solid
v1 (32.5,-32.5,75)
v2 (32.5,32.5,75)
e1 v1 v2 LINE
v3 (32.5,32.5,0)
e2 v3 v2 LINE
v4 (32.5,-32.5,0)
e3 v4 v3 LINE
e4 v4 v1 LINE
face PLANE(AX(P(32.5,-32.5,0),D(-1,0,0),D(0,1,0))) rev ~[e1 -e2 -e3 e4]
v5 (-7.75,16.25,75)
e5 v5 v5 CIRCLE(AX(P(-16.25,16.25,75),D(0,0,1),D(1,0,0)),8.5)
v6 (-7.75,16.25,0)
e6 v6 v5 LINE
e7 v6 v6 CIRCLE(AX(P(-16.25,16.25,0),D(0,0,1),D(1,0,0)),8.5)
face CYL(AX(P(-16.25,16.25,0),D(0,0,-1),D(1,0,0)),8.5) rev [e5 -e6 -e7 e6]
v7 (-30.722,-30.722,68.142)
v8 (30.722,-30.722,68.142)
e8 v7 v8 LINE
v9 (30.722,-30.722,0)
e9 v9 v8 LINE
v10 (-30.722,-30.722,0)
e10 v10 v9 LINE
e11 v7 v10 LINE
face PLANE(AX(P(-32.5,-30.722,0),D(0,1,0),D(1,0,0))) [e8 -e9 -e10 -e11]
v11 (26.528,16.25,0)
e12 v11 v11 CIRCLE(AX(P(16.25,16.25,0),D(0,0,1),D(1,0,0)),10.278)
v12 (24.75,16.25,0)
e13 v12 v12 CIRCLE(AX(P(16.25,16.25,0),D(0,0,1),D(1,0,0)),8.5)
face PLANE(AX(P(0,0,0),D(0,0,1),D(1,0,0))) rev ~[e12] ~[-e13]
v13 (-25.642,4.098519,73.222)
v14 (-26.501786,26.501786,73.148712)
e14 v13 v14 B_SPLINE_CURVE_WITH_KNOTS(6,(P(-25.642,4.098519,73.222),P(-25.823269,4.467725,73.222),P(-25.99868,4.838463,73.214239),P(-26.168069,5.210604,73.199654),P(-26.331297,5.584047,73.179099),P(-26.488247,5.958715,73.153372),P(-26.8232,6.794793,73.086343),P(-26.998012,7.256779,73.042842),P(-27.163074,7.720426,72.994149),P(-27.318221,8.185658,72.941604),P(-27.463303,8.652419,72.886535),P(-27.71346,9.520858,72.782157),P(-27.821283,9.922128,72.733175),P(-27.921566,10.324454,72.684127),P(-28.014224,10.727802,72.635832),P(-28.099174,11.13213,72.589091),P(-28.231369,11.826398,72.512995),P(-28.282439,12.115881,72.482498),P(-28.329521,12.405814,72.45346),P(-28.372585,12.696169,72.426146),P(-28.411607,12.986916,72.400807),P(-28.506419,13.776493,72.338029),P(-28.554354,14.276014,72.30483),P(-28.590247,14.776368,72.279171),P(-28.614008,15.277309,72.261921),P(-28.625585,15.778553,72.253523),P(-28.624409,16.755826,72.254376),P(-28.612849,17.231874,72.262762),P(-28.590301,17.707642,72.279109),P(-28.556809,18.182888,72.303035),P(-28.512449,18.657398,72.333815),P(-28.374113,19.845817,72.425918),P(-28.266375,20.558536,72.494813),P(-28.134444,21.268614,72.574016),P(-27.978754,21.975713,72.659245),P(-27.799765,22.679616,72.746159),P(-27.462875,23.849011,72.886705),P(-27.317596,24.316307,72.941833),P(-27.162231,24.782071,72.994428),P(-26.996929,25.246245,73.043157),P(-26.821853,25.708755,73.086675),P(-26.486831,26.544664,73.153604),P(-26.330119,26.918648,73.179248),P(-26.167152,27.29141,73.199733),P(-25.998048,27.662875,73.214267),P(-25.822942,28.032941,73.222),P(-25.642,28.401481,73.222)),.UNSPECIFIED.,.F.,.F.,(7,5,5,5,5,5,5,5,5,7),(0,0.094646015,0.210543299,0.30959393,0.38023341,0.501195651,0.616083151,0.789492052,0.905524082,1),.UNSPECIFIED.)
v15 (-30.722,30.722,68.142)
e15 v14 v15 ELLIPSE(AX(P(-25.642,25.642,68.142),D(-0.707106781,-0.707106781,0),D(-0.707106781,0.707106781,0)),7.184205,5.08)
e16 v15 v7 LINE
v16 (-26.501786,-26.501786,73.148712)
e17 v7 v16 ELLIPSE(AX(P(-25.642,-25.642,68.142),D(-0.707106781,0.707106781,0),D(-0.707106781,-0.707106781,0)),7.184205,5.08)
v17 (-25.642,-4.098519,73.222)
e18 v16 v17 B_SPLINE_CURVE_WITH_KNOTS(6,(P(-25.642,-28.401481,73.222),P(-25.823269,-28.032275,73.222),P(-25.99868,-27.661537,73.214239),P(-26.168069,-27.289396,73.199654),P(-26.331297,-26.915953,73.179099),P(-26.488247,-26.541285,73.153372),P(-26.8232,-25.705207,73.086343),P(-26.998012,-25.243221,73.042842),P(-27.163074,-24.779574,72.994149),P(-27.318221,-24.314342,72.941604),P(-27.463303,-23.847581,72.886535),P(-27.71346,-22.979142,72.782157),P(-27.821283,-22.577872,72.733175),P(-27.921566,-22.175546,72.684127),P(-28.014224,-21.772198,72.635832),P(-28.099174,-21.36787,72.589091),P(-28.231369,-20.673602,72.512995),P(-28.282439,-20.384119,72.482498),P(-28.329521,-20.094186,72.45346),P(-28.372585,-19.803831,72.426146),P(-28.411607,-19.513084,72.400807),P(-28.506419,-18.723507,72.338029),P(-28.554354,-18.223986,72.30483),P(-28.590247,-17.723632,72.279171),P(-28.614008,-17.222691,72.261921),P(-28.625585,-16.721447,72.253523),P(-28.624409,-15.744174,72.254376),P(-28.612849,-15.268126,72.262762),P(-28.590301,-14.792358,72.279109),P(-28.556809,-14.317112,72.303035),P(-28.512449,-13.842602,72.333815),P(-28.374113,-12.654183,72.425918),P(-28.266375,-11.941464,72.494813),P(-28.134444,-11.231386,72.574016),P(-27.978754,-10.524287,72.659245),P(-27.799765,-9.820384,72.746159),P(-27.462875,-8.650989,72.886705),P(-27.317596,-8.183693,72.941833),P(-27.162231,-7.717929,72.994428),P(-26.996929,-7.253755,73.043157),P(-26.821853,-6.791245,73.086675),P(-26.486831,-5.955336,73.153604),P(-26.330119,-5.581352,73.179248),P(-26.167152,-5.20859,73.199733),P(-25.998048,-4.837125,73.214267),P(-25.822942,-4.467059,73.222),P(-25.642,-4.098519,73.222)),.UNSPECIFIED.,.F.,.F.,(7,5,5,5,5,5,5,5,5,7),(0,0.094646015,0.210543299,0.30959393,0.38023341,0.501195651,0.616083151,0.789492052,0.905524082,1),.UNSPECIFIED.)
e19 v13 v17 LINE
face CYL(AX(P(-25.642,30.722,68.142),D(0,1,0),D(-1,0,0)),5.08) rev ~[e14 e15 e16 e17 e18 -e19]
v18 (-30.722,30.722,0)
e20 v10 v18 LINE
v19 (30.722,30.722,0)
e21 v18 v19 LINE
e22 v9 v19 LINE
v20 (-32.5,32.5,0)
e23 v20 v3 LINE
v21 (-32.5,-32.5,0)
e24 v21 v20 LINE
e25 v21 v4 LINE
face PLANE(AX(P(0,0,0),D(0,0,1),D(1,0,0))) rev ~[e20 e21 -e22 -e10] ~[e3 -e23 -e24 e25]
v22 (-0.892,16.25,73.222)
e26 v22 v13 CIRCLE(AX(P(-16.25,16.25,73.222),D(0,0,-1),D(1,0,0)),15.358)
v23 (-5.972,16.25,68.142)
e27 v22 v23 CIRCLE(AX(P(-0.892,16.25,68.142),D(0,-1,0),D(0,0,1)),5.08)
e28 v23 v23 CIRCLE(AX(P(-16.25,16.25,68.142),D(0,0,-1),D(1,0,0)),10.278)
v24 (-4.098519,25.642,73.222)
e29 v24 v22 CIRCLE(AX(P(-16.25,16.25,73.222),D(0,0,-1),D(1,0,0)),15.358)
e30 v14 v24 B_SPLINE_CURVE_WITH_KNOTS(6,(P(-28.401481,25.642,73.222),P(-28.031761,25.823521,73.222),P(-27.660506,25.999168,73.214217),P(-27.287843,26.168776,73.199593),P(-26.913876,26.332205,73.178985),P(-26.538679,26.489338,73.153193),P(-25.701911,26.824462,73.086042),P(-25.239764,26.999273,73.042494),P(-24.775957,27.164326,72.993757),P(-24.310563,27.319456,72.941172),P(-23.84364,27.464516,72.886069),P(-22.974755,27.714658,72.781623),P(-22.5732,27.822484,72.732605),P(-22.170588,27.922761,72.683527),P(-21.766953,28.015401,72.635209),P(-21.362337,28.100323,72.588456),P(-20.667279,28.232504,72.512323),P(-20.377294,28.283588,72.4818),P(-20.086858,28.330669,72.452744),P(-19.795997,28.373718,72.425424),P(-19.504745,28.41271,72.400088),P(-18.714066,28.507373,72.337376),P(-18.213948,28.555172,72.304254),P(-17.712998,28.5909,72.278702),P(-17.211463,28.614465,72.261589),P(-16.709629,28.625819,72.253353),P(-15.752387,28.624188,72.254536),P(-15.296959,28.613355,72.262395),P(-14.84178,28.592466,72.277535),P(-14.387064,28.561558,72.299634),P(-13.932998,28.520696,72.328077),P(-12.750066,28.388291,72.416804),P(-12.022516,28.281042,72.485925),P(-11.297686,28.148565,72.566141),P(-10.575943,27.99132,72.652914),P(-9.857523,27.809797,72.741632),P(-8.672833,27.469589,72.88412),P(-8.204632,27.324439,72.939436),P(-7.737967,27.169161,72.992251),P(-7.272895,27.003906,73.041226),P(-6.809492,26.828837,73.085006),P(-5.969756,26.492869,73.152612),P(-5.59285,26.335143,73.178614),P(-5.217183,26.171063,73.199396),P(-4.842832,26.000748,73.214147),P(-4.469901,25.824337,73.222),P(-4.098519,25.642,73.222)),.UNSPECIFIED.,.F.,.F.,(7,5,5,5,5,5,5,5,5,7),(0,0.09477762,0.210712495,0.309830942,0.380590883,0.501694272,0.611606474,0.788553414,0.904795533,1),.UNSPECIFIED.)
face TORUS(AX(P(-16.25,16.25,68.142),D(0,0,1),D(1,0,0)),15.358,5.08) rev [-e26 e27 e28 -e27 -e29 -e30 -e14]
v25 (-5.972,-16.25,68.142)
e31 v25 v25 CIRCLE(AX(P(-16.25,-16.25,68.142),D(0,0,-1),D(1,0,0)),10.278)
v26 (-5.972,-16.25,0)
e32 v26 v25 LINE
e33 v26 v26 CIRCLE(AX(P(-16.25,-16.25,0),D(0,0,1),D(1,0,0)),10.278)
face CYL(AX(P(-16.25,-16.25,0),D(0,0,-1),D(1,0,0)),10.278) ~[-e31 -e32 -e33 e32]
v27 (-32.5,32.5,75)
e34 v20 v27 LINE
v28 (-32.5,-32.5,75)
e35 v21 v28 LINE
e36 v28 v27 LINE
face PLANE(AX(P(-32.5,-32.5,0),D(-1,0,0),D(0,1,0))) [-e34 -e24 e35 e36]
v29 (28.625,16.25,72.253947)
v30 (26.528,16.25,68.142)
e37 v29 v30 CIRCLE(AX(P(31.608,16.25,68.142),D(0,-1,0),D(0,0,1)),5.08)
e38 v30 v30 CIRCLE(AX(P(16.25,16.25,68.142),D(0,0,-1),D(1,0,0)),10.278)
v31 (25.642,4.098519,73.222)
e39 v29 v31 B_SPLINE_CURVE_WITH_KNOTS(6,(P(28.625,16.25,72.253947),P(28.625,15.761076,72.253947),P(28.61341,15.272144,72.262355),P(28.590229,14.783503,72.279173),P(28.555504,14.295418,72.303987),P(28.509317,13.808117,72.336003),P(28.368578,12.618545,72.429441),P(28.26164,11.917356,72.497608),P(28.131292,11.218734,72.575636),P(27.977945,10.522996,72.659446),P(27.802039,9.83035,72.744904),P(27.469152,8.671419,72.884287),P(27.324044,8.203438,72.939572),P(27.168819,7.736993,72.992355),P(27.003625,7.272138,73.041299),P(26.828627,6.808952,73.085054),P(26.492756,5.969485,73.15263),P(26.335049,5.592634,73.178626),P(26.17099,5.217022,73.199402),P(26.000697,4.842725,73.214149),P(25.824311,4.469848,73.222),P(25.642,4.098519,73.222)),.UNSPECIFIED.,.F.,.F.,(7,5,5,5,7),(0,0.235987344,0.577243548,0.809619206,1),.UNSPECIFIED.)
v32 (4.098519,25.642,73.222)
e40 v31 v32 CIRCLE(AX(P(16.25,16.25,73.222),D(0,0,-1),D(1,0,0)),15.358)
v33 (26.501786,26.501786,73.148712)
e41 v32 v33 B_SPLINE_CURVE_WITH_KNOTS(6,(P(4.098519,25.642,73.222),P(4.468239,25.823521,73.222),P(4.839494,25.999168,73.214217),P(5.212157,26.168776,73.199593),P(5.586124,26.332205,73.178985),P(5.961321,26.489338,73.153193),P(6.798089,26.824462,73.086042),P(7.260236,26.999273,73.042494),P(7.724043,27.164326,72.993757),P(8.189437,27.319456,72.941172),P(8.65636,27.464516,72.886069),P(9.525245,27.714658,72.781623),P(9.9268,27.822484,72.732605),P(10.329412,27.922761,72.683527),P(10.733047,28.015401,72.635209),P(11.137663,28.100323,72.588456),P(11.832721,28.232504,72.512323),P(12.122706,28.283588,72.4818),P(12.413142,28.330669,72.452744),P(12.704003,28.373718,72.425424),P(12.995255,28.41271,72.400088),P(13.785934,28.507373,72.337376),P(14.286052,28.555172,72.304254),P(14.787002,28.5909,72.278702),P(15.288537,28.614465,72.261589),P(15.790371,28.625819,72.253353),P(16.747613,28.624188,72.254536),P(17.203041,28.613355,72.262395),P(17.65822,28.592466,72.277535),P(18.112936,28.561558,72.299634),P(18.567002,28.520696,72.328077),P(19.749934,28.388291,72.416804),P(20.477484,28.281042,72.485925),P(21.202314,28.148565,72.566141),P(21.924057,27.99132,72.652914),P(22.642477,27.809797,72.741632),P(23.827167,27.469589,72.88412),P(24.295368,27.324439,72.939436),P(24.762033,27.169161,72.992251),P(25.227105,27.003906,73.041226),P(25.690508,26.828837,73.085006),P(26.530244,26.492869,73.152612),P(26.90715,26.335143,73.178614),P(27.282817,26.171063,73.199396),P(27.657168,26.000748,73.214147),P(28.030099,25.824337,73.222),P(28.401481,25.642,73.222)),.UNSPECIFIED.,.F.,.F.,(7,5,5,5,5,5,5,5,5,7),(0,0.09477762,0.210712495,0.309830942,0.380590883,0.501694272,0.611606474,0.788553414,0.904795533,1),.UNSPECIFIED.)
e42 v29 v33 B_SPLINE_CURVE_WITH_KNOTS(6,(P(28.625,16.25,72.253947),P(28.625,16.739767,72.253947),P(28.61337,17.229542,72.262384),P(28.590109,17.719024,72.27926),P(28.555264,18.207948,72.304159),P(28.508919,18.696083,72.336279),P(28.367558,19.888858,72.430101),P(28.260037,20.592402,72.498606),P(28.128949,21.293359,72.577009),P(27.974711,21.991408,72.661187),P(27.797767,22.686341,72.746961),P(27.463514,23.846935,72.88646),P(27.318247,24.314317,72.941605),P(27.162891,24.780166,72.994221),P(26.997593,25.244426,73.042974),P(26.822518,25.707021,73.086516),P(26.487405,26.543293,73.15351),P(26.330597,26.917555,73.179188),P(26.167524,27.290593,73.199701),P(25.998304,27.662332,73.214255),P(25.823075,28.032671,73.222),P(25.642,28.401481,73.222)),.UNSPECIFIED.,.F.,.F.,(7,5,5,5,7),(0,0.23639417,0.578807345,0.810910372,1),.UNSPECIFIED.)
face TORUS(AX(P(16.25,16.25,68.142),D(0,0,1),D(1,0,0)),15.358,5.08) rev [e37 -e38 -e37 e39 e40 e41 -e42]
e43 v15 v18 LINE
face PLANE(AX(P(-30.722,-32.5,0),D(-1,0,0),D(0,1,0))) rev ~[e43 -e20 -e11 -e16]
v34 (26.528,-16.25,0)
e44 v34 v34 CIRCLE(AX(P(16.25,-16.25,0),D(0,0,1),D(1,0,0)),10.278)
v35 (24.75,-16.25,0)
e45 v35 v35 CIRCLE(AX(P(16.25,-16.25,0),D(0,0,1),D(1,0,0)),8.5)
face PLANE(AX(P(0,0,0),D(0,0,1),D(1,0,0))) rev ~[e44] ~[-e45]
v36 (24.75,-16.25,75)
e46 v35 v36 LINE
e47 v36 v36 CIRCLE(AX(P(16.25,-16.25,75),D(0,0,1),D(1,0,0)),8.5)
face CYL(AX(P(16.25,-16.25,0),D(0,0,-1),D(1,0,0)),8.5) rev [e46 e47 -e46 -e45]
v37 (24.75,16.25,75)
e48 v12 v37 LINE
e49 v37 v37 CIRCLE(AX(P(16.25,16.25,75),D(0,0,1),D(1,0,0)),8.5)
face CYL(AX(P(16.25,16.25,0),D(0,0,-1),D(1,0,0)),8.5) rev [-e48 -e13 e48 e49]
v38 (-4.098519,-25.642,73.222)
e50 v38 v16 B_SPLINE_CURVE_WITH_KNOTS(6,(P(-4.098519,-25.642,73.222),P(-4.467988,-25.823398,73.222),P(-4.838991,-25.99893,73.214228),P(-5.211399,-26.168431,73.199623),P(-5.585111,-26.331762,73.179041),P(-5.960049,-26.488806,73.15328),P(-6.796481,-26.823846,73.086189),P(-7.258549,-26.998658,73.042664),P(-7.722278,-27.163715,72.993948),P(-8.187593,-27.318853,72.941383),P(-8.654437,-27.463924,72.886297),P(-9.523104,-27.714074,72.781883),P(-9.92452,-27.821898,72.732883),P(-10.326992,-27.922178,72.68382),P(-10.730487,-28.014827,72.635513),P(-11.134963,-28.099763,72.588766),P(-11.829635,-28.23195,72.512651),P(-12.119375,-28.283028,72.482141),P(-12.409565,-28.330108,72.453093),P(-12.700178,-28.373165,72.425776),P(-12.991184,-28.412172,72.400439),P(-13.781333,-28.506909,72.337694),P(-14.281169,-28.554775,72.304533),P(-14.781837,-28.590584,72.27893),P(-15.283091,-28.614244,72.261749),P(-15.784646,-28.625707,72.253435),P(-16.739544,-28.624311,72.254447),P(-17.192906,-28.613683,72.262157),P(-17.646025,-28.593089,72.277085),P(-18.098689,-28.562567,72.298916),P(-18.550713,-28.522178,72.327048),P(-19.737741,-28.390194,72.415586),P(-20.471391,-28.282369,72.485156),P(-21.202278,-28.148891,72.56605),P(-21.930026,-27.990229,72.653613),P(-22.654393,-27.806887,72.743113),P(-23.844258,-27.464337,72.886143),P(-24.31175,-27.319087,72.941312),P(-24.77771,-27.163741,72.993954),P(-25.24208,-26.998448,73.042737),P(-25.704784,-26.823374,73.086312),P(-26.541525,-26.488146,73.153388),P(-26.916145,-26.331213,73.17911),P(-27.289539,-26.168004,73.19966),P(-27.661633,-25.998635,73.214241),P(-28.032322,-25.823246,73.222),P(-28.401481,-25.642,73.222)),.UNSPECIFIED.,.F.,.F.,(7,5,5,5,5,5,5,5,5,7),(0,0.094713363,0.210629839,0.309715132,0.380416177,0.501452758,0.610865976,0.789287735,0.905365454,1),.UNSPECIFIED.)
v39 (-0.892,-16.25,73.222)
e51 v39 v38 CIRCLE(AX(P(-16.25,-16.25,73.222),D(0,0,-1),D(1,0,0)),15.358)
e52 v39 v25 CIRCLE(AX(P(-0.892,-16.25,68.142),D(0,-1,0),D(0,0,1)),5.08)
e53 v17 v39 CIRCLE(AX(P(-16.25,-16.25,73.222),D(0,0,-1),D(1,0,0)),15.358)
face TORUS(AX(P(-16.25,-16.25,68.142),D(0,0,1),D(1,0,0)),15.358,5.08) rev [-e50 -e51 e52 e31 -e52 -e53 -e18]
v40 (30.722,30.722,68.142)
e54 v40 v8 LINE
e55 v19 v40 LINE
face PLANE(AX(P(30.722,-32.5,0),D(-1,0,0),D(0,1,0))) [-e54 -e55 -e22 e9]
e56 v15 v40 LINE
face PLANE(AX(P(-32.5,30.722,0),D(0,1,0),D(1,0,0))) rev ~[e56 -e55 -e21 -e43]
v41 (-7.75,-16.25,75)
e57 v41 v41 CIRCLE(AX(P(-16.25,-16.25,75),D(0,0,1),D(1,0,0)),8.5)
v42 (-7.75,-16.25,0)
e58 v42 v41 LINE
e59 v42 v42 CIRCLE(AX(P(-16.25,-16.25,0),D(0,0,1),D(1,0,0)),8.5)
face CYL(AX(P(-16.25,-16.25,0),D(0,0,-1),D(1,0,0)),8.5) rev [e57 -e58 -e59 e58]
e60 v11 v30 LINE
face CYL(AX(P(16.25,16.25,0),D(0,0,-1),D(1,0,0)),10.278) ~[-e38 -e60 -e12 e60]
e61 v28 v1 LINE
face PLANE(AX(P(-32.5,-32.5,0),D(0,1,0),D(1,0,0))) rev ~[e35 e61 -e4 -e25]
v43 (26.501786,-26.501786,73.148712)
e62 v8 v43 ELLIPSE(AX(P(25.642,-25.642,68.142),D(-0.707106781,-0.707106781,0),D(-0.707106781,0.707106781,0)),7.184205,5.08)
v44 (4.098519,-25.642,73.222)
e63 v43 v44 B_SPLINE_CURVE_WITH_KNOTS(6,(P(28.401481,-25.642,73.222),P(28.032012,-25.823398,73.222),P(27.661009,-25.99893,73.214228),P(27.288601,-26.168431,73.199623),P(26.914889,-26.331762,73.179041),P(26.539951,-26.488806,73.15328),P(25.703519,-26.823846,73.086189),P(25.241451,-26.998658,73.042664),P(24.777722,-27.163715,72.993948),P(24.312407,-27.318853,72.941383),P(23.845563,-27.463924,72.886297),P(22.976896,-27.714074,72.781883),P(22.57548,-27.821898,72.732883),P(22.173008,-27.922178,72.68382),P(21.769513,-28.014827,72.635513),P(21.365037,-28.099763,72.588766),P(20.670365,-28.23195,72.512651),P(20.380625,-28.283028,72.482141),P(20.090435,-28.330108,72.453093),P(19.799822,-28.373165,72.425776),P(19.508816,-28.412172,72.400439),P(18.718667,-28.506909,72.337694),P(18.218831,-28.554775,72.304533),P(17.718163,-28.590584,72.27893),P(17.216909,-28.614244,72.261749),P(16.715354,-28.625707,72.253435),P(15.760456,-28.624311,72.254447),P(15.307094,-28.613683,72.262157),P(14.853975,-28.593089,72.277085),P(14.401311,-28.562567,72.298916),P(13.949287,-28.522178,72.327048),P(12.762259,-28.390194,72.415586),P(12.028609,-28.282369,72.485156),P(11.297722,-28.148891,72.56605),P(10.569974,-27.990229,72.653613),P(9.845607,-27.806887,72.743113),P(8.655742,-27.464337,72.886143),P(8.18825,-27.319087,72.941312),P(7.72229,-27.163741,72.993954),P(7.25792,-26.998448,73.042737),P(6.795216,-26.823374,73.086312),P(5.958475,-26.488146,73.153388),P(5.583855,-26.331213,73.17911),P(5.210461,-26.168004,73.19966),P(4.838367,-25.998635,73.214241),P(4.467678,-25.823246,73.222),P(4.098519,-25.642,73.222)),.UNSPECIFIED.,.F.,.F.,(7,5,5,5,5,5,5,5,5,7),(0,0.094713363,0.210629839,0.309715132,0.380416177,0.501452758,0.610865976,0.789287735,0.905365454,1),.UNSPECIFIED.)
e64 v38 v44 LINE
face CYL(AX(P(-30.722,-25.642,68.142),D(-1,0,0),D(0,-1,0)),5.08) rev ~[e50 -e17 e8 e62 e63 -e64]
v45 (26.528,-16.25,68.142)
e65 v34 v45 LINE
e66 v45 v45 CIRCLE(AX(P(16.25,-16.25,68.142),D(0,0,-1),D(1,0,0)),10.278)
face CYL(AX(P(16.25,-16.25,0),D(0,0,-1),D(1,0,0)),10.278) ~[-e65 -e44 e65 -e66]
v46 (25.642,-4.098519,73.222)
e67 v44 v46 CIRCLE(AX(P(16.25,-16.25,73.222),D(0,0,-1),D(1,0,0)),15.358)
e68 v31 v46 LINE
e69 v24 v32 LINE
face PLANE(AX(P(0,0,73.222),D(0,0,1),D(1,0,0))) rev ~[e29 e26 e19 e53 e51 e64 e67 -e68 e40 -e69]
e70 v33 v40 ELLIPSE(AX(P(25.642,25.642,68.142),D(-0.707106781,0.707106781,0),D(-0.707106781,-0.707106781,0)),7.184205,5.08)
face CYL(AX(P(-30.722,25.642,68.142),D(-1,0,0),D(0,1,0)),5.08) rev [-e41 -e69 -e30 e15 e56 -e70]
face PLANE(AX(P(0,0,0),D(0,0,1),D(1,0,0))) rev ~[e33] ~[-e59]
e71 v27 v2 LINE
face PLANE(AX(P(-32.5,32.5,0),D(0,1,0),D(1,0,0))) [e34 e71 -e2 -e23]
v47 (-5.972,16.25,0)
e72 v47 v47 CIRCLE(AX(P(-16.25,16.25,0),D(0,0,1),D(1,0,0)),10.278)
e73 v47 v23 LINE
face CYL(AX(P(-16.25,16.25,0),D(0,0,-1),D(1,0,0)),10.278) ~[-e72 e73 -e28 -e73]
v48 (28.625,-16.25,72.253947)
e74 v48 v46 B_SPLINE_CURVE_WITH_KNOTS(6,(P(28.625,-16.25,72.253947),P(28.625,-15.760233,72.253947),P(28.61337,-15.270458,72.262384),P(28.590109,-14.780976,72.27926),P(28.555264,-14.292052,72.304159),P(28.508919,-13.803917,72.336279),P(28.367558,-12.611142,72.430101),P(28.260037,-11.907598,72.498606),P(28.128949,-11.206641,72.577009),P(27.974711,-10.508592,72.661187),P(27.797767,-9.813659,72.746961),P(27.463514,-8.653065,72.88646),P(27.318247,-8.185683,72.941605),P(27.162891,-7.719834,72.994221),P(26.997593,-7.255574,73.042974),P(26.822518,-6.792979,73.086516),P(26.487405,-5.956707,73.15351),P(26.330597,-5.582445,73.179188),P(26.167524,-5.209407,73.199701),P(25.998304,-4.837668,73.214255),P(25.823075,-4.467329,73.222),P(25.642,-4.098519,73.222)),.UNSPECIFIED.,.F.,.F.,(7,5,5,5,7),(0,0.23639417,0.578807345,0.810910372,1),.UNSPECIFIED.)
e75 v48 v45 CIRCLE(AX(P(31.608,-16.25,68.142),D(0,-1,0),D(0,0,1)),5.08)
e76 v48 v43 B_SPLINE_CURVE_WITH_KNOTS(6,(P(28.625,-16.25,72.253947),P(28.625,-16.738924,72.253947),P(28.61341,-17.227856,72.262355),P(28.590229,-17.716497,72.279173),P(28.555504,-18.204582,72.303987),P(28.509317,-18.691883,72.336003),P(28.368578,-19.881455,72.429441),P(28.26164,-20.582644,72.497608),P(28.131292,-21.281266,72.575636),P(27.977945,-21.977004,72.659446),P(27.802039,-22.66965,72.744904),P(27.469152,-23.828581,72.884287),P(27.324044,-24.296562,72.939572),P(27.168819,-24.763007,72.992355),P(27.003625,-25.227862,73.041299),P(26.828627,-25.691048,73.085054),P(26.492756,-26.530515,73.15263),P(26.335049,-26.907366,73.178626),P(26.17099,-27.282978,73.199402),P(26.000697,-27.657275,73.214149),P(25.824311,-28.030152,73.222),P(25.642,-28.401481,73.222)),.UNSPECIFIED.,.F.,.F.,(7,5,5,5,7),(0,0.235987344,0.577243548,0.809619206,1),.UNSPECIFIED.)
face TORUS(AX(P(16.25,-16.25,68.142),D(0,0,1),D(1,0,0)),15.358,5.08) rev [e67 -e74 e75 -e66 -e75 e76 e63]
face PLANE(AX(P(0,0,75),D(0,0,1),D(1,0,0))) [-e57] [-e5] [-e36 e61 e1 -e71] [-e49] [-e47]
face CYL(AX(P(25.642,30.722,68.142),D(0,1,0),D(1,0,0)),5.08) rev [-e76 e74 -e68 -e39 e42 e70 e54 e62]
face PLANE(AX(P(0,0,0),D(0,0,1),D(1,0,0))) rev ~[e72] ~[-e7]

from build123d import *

# Parameters (mm, degrees)
F0_W        = 65
F0_H        = 65
F0_R        = 8.5
F1_DEPTH    = 75
F2_T        = -1.778
F3_T1_DEPTH = 61.444
F3_T3_DEPTH = 61.444


# Not quite as in the source:
# - a fillet or chamfer that OpenCascade refuses, or shapes differently, is made with other operations: its cross-section is extruded or revolved along the edge and cut away or added


with BuildPart() as f1:
    # F0 (on Top) → F1 (new body)
    with BuildSketch(Plane.XY):
        Rectangle(F0_W, F0_H)
        with Locations((-16.25, -16.25)):
            Circle(F0_R, mode=Mode.SUBTRACT)
        with Locations((16.25, -16.25)):
            Circle(F0_R, mode=Mode.SUBTRACT)
        with Locations((-16.25, 16.25)):
            Circle(F0_R, mode=Mode.SUBTRACT)
        with Locations((16.25, 16.25)):
            Circle(F0_R, mode=Mode.SUBTRACT)
    extrude(amount=F1_DEPTH)

    # F2
    f2_openings = [f1.faces().sort_by_distance(p)[0] for p in [
        (0, 0, 0),
    ]]
    offset(amount=F2_T, openings=f2_openings)

    # F3: fillet of radius 5.08 on 8 edges, made by hand

    # F3_s2 → F3_t1 (join)
    with BuildSketch(Plane.YZ.offset(-30.722)):
        with BuildLine():
            ThreePointArc((30.722, 68.142), (29.2341024484, 71.7341024484), (25.642, 73.222))
            Line((25.642, 73.222), (30.722, 73.222))
            Line((30.722, 73.222), (30.722, 68.142))
        make_face()
        with BuildLine():
            ThreePointArc((-30.722, 68.142), (-29.2341024484, 71.7341024484), (-25.642, 73.222))
            Line((-25.642, 73.222), (-30.722, 73.222))
            Line((-30.722, 73.222), (-30.722, 68.142))
        make_face()
    extrude(amount=F3_T1_DEPTH)

    # F3_s4 → F3_t3 (join)
    with BuildSketch(Plane.XZ.offset(-30.722)):
        with BuildLine():
            ThreePointArc((-30.722, 68.142), (-29.2341024484, 71.7341024484), (-25.642, 73.222))
            Line((-25.642, 73.222), (-30.722, 73.222))
            Line((-30.722, 73.222), (-30.722, 68.142))
        make_face()
        with BuildLine():
            ThreePointArc((30.722, 68.142), (29.2341024484, 71.7341024484), (25.642, 73.222))
            Line((25.642, 73.222), (30.722, 73.222))
            Line((30.722, 73.222), (30.722, 68.142))
        make_face()
    extrude(amount=F3_T3_DEPTH)

    # F3_s5 → F3_t6 (revolve)
    with BuildSketch(Plane.XZ.offset(16.25)):
        with BuildLine():
            ThreePointArc((-0.892, 73.222), (-4.4841024484, 71.7341024484), (-5.972, 68.142))
            Line((-5.972, 68.142), (-5.972, 73.222))
            Line((-5.972, 73.222), (-0.892, 73.222))
        make_face()
    revolve(axis=Axis((-16.25, -16.25, 73.222), (0, 0, -1)))

    # F3_s7 → F3_t8 (revolve)
    with BuildSketch(Plane.XZ.offset(16.25)):
        with BuildLine():
            ThreePointArc((31.608, 73.222), (28.0158975516, 71.7341024484), (26.528, 68.142))
            Line((26.528, 68.142), (26.528, 73.222))
            Line((26.528, 73.222), (31.608, 73.222))
        make_face()
    revolve(axis=Axis((16.25, -16.25, 73.222), (0, 0, -1)))

    # F3_s9 → F3_t10 (revolve)
    with BuildSketch(Plane.XZ.offset(-16.25)):
        with BuildLine():
            ThreePointArc((-0.892, 73.222), (-4.4841024484, 71.7341024484), (-5.972, 68.142))
            Line((-5.972, 68.142), (-5.972, 73.222))
            Line((-5.972, 73.222), (-0.892, 73.222))
        make_face()
    revolve(axis=Axis((-16.25, 16.25, 73.222), (0, 0, -1)))

    # F3_s11 → F3_t12 (revolve)
    with BuildSketch(Plane.XZ.offset(-16.25)):
        with BuildLine():
            ThreePointArc((31.608, 73.222), (28.0158975516, 71.7341024484), (26.528, 68.142))
            Line((26.528, 68.142), (26.528, 73.222))
            Line((26.528, 73.222), (31.608, 73.222))
        make_face()
    revolve(axis=Axis((16.25, 16.25, 73.222), (0, 0, -1)))


solid = f1.part
